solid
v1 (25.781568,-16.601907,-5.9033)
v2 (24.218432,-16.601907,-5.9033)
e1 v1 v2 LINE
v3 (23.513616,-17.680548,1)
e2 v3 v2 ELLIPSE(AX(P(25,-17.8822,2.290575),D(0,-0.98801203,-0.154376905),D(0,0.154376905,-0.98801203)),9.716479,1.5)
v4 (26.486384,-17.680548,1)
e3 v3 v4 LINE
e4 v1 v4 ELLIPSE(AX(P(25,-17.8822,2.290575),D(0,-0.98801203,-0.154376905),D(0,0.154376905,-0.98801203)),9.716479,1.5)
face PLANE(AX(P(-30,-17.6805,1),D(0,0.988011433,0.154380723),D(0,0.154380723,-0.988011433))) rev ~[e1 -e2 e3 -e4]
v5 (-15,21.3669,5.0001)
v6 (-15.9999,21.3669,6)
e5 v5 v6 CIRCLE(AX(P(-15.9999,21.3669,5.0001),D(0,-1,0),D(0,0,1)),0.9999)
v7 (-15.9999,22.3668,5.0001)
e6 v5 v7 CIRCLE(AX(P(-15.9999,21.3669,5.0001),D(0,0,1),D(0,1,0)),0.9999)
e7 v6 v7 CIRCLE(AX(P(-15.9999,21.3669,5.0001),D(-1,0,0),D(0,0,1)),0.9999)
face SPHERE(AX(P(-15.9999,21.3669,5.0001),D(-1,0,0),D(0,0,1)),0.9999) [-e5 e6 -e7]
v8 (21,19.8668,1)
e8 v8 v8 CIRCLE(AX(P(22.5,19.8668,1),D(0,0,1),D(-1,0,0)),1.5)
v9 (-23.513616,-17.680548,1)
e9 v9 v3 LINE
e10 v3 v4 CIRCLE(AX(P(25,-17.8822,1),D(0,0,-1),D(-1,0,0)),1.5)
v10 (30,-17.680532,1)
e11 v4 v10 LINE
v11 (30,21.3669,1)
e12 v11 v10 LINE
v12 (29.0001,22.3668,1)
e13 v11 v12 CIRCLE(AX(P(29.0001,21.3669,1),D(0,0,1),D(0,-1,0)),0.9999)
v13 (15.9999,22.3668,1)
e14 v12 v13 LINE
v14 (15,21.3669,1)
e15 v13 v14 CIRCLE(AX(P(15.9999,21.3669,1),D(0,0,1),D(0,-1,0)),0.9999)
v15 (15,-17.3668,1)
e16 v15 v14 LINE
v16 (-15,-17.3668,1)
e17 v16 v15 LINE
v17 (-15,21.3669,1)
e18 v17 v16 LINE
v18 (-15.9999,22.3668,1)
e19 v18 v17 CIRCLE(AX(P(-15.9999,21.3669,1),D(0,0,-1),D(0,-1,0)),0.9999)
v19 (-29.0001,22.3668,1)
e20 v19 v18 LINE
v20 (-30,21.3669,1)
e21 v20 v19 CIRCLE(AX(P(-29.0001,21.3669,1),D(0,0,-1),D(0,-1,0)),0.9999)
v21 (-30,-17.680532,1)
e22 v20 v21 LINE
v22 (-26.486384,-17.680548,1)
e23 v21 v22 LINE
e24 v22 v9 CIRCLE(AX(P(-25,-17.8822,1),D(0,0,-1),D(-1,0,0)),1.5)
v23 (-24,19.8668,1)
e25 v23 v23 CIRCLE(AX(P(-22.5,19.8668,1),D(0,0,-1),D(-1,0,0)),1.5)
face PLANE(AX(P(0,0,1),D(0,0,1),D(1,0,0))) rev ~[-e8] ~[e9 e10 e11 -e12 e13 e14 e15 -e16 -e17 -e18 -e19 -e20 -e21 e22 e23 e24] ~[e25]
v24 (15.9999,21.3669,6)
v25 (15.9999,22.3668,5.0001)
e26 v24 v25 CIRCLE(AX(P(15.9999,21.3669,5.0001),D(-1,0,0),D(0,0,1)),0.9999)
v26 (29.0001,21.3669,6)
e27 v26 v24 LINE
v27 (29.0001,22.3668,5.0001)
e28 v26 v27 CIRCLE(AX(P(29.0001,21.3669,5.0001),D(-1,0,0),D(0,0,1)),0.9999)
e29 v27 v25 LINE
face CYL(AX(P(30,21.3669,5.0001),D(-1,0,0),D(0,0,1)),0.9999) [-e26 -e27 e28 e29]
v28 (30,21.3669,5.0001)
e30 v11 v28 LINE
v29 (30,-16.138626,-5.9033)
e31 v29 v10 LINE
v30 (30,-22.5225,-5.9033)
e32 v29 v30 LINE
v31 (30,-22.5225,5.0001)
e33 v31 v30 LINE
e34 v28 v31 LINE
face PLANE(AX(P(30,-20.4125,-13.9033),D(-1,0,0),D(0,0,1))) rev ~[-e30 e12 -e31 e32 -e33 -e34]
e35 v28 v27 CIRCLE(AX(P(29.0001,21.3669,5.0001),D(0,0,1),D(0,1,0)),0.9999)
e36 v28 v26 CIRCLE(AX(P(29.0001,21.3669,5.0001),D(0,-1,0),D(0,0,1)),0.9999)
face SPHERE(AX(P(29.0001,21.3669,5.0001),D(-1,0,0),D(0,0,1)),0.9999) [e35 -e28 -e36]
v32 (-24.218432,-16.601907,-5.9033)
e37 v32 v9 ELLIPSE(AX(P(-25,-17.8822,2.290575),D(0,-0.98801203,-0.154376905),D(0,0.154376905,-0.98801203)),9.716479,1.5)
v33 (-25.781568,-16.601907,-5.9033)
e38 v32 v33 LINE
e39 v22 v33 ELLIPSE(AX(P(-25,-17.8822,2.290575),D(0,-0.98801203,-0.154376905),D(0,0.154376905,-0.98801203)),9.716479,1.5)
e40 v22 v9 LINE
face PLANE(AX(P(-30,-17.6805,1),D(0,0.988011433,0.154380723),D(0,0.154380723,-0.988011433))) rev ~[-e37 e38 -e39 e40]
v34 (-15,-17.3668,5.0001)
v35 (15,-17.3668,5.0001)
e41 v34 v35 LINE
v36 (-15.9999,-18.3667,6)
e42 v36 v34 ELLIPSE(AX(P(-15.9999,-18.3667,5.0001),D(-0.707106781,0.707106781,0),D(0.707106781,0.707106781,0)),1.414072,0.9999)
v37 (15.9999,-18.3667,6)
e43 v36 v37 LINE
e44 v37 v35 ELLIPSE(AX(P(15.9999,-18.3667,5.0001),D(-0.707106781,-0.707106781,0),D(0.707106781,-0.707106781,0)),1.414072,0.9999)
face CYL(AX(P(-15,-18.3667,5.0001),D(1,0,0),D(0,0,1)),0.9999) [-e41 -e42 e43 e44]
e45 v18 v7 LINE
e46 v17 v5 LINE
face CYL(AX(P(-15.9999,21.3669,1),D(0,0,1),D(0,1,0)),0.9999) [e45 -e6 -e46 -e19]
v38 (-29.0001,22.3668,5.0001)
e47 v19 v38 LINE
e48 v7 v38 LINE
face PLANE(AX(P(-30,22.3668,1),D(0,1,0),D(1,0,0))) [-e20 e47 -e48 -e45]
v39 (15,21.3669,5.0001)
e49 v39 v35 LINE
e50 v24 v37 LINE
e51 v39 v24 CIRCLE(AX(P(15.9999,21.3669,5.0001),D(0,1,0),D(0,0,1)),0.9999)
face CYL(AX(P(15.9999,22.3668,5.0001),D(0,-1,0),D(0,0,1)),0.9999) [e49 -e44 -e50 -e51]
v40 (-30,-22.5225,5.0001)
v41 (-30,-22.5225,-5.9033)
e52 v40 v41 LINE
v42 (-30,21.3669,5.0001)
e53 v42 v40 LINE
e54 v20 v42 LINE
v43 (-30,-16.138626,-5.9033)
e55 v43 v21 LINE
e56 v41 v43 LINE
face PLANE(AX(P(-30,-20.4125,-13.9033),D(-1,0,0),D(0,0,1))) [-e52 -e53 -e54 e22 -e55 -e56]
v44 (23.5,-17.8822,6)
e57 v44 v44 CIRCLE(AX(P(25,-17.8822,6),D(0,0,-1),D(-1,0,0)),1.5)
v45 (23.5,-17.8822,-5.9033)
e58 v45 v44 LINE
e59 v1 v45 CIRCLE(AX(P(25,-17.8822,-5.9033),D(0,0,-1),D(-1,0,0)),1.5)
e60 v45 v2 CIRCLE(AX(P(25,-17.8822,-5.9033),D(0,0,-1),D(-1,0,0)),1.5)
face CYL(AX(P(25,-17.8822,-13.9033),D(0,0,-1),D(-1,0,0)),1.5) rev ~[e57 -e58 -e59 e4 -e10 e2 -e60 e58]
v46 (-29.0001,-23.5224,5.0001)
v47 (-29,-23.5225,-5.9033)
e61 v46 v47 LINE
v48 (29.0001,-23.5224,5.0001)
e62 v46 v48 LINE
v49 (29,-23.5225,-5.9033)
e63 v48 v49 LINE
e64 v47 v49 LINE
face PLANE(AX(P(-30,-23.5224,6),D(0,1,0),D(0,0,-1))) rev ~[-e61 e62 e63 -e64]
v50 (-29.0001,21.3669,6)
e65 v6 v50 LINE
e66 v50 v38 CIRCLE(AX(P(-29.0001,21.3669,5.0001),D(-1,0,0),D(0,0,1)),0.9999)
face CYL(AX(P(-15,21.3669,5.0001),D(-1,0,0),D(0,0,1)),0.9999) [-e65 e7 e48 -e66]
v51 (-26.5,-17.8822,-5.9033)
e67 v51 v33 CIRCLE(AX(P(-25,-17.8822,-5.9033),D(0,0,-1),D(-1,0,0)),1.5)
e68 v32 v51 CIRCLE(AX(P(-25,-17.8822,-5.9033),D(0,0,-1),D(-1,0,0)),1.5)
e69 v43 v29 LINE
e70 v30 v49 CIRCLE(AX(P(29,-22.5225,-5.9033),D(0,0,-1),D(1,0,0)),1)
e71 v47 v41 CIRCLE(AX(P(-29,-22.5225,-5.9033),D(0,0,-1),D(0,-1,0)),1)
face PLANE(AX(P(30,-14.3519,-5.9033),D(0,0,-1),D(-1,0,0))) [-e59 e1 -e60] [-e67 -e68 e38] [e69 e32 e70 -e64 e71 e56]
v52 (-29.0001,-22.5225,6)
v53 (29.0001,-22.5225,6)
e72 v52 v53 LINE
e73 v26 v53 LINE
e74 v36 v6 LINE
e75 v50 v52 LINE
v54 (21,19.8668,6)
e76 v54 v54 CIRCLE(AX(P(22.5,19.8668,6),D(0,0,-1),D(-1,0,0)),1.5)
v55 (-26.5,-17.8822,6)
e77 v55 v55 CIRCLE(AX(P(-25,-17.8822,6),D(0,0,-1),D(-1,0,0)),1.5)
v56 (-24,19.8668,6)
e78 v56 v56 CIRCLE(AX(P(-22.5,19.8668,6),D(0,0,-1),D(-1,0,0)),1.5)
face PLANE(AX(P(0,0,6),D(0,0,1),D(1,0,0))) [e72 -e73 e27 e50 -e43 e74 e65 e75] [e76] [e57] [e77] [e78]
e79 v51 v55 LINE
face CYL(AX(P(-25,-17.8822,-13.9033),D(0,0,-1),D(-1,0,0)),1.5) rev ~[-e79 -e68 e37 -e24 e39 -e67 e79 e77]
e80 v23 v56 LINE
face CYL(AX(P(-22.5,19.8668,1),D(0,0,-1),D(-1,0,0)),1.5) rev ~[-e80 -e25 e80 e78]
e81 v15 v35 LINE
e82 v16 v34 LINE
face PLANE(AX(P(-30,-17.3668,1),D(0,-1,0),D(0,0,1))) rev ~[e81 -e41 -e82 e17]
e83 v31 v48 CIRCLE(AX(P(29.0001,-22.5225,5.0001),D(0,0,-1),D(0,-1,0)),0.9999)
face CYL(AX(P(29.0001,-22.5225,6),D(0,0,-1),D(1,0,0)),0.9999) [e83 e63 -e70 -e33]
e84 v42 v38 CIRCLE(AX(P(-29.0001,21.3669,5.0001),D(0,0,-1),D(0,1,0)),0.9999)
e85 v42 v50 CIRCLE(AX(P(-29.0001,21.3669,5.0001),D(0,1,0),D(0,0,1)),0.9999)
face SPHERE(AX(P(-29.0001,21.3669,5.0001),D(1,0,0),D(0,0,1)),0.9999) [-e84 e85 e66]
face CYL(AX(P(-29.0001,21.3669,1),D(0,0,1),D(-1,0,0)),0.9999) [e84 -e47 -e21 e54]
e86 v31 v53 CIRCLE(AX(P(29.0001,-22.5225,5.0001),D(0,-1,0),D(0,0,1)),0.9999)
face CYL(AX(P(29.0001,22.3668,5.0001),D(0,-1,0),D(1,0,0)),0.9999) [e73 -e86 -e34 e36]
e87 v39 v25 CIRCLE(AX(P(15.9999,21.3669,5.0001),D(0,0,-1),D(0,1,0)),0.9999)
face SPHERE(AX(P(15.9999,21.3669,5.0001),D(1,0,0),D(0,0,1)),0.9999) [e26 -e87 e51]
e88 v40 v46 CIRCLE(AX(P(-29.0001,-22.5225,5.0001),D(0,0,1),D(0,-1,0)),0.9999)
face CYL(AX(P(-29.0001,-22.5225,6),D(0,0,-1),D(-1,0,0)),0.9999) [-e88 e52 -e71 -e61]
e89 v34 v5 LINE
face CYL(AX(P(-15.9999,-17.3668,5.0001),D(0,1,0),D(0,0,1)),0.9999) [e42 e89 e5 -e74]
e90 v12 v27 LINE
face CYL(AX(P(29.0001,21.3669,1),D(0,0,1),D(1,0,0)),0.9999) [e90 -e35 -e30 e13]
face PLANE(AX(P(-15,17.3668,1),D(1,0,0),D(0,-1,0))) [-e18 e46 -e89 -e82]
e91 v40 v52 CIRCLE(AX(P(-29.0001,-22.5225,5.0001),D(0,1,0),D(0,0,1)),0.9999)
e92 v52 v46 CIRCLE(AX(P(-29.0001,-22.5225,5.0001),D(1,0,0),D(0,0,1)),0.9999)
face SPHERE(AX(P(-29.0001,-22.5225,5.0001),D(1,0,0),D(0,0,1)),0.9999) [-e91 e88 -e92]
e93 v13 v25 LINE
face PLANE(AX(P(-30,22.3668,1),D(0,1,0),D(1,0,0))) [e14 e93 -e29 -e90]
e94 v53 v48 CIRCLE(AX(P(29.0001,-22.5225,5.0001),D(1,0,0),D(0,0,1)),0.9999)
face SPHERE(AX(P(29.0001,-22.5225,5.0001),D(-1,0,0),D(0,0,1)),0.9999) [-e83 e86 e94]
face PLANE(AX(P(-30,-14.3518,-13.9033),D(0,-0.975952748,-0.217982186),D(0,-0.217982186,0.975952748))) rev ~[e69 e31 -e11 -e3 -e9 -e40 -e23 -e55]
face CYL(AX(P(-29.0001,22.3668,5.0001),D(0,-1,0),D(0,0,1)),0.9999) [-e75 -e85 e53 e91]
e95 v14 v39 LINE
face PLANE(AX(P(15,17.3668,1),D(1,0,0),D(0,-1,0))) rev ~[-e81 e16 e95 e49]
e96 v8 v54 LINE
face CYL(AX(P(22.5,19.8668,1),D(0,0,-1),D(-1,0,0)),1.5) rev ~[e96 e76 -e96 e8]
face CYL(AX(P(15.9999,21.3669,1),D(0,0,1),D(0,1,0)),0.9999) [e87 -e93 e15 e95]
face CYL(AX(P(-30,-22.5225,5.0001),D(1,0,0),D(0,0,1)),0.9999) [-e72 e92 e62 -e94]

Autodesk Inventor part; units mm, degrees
ref_plane "YZ Plane" through (0, 0, 0) normal (1, 0, 0) x (0, 1, 0)
ref_plane "XZ Plane" through (0, 0, 0) normal (0, 1, 0) x (-1, 0, 0)
ref_plane "Work Plane1" through (0, 0, 1) normal (0, 0, 1) x (1, 0, 0)
sketch "Sketch2" plane through (0, 0, 1) normal (0, 0, 1) x (1, 0, 0)
  line L0 (-29.9972, 16.3668) -> (29.9972, 16.3668) construction
  line L1 (29.9972, -16.3668) -> (-29.9972, -16.3668) construction
  circle A0 centre (0, 0) radius 8 construction
  line L2 (-18, -2.183) -> (-18, 3.067) construction
  line L3 (17.5, -1.0311) -> (17.5, 1.567) construction
  line L4 (0, 16.3668) -> (0, 17.3668) construction
  line L5 (0, -16.3668) -> (0, -17.3668) construction
  line L6 (0, 17.3668) -> (-30, 17.3668) construction
  line L7 (0, 17.3668) -> (30, 17.3668) construction
  line L8 (-30, 17.3668) -> (30, 17.3668) construction
  line L9 (30, 17.3668) -> (30, -17.3668) construction
  line L10 (30, -17.3668) -> (-30, -17.3668) construction
  line L11 (-30, -17.3668) -> (-30, 17.3668) construction
  line L12 (-30, 17.3668) -> (-15, 17.3668)
  line L13 (-15, 17.3668) -> (-15, -17.3668)
  line L14 (-15, -17.3668) -> (-30, -17.3668)
  line L15 (-30, -17.3668) -> (-30, 17.3668)
  line L16 (30, 17.3668) -> (15, 17.3668)
  line L17 (15, 17.3668) -> (15, -17.3668)
  line L18 (15, -17.3668) -> (30, -17.3668)
  line L19 (30, -17.3668) -> (30, 17.3668)
  point P0 (0, 0)
  dimension "d0" = 1
  dimension "d1" = 1
  dimension "d2" = 30
  dimension "d3" = 30
  dimension "d4" = 15
  dimension "d5" = 15
extrude "Extrusion1" add sketch "Sketch2" along normal blind 5
ref_plane "Work Plane2" through (0, -13.2935, -27.0771) normal (0, -0.988012, -0.1543769) x (-1, 0, 0)
sketch "Sketch3" plane through (0, -13.2935, -27.0771) normal (0, -0.988012, -0.1543769) x (-1, 0, 0)
  line L0 (15, -28.3694) -> (30, -28.3694) projected
  line L1 (15, -28.3694) -> (15, -33.3094) projected
  line L2 (30, -33.3094) -> (15, -33.3094) projected
  line L3 (30, -28.3694) -> (30, -33.3094) projected
  line L4 (-15, -28.3694) -> (-30, -28.3694) projected
  line L5 (-30, -28.3694) -> (-30, -33.3094) projected
  line L6 (-15, -33.3094) -> (-30, -33.3094) projected
  line L7 (-15, -28.3694) -> (-15, -33.3094) projected
  line L8 (-24.9964, -11.75) -> (24.9964, -11.75) projected
  line L9 (-30, -33.3094) -> (30, -33.3094)
  line L10 (30, -33.3094) -> (30, -11.3094)
  line L11 (30, -11.3094) -> (-30, -11.3094)
  line L12 (-30, -11.3094) -> (-30, -33.3094)
  point P0 (0, -24.7003)
  dimension "d8" = 60
  dimension "d9" = 22
extrude "Extrusion2" add sketch "Sketch3" along normal blind 5
sketch "Sketch5" plane through (-30, -17.3668, 1) normal (-1, 0, 0) x (0, 0, 1)
  line L0 (0, 0) -> (0, 34.7337) projected
  line L1 (0, 0) -> (5, 0) projected
  line L2 (5, 34.7337) -> (5, 0) projected
  line L3 (0, 34.7337) -> (5, 34.7337) projected
  line L4 (4.833, -1.0688) -> (-16.9033, 2.3275) projected
  line L5 (-16.9033, 2.3275) -> (-17.6752, -2.6126) projected
  line L6 (4.0611, -6.0089) -> (-17.6752, -2.6126) projected
  line L7 (4.833, -1.0688) -> (4.0611, -6.0089) projected
  line L8 (5, 0) -> (5, -6.1556)
  line L9 (4.0611, -6.0089) -> (-17.6752, -2.6126) projected
  line L10 (5, -6.1556) -> (4.0611, -6.0089)
  line L11 (0, 0) -> (5, 0) projected
  line L12 (0, 0) -> (0, -3.0778)
  line L13 (4.833, -1.0688) -> (4.0611, -6.0089) projected
  line L14 (0, -3.0778) -> (4.0611, -6.0089)
  point P0 (-1, 17.3668)
extrude "Extrusion3" add sketch "Sketch5" against normal up to surface (60 mm away) contours L1 L8 L10 L7 L4 L12 | L4 L7 L14 L12
sketch "Sketch6" plane through (-30, 17.3668, 1) normal (-1, 0, 0) x (0, 0, 1)
  line L0 (0, -35.0474) -> (0, 0) projected
  line L1 (0, -35.0474) -> (-16.9033, -32.4062) projected
  line L2 (-16.9033, -32.4062) -> (-17.6752, -37.3463) projected
  line L3 (-17.6752, -37.3463) -> (5, -40.8893) projected
  line L4 (5, 0) -> (5, -40.8893) projected
  line L5 (0, 0) -> (5, 0) projected
  line L6 (-16.9033, -32.4062) -> (-24.0532, -32.4062)
  line L7 (-24.0532, -32.4062) -> (-24.0532, -41.4181)
  line L8 (-24.0532, -41.4181) -> (-16.9033, -41.4181)
  line L9 (-16.9033, -41.4181) -> (-16.9033, -32.4062)
  line L10 (-16.9033, -32.4062) -> (-14.9033, -32.4062)
  line L11 (-14.9033, -32.4062) -> (-14.9033, -41.4181)
  line L12 (-14.9033, -41.4181) -> (-16.9033, -41.4181)
  line L13 (-16.9033, -41.4181) -> (-16.9033, -32.4062)
  point P0 (-1, -17.3668)
  dimension "d18" = 2
extrude "Extrusion4" cut sketch "Sketch6" against normal through all contours L11 L3 L9 L1 | L1 L10 L11 | L9 L3 L2 | L2 L3 L9 L8 L7 L6 | L11 L12 L9 L3
sketch "Sketch7" plane through (-30, 17.3668, 1) normal (0, 1, 0) x (1, 0, 0)
  line L0 (0, 0) -> (15, 0) projected
  line L1 (0, 0) -> (0, -5) projected
  line L2 (15, -5) -> (0, -5) projected
  line L3 (15, 0) -> (15, -5) projected
  line L4 (60, 0) -> (45, 0) projected
  line L5 (45, 0) -> (45, -5) projected
  line L6 (60, -5) -> (45, -5) projected
  line L7 (60, 0) -> (60, -5) projected
  point P0 (30, 1)
extrude "Extrusion5" add sketch "Sketch7" along normal blind 5
ref_plane "Work Plane3" through (-30, -20.4125, -11.9033) normal (0, 0, -1) x (-1, 0, 0)
sketch "Sketch8" plane through (-30, -20.4125, -11.9033) normal (0, 0, -1) x (-1, 0, 0)
  line L0 (-7.7, 0) -> (-6, 0) projected
  line L1 (-2.3, 5.0607) -> (-7.7, 5.0607) projected
  circle A0 centre (-5, 2.5303) radius 1.5 projected
  line L2 (-7.7, 0) -> (-6, 0) projected
  line L3 (-57.6, 0) -> (-52.4, 0)
  line L4 (-52.4, 0) -> (-52.4, -6.7313)
  line L5 (-52.4, -6.7313) -> (-57.6, -6.7313)
  line L6 (-57.6, -6.7313) -> (-57.6, 0)
  line L7 (-7.6, 1.0292) -> (-2.4, 1.0292)
  line L8 (-2.4, 1.0292) -> (-2.4, -4.6372)
  line L9 (-2.4, -4.6372) -> (-7.6, -4.6372)
  line L10 (-7.6, -4.6372) -> (-7.6, 1.0292)
  line L11 (-6, 0) -> (-2.3, 0) projected
  line L12 (-2.3, 5.0607) -> (-7.7, 5.0607) projected
  line L13 (-6, 0) -> (-2.3, 0) projected
  circle A1 centre (-5, 2.5303) radius 1.5 projected
  line L14 (-7.7, 5.0607) -> (-7.7, 0) projected
  line L15 (-2.3, 0) -> (-2.3, 5.0607) projected
  line L16 (-7.7, 5.0607) -> (-7.7, 0) projected
  line L17 (-2.3, 0) -> (-2.3, 5.0607) projected
  point P0 (-30, 20.4125)
  point P1 (-7.2835, 0)
  point P2 (-2.4, 0)
  point P3 (-7.2835, 0.8465)
  point P4 (-7.6, 1.0292)
  point P5 (-7.6, 4.0314)
  point P6 (-5.8173, 5.0607)
  point P7 (-4.1827, 5.0607)
  point P8 (-2.4, 4.0314)
extrude "Extrusion6" [suppressed]
sketch "Sketch9" plane through (-30, -20.4125, -13.9033) normal (0, 0, -1) x (-1, 0, 0)
  circle A0 centre (-55, 2.5303) radius 1.5 projected
  circle A1 centre (-5, 2.5303) radius 1.5 projected
  point P0 (-30, 20.4125)
extrude "Extrusion7" cut sketch "Sketch9" against normal blind 8
sketch "Sketch10" plane through (0, 0, 1) normal (0, 0, -1) x (-1, 0, 0)
  line L0 (15, 22.3649) -> (15, 22.3668) projected
  line L1 (30, 22.3668) -> (30, 22.3649) projected
  line L2 (30, 22.3668) -> (15, 22.3668) projected
  line L3 (-30, 22.3649) -> (-30, 22.3668) projected
  line L4 (-15, 22.3668) -> (-15, 22.3649) projected
  line L5 (-15, 22.3668) -> (-30, 22.3668) projected
  line L6 (-15, 22.3668) -> (-30, 22.3668) projected
  line L7 (-30, 22.3668) -> (-30, 19.8668)
  line L8 (-30, 22.3668) -> (-30, -17.6805) projected
  line L9 (-30, 19.8668) -> (-22.5, 19.8668)
  line L10 (30, 22.3668) -> (30, 19.8668)
  line L11 (30, -17.6805) -> (30, 22.3668) projected
  line L12 (30, 19.8668) -> (22.5, 19.8668)
  circle A0 centre (-22.5, 19.8668) radius 1.5
  circle A1 centre (22.5, 19.8668) radius 1.5
  line L13 (15, 22.3649) -> (30, 22.3649) projected
  line L14 (-30, 22.3649) -> (-15, 22.3649) projected
  point P0 (0, 0)
  point P1 (30, 17.3668)
  point P2 (-30, 17.3668)
  dimension "d24" = 2.5
  dimension "d25" = 7.5
  dimension "d26" = 2.5
  dimension "d27" = 7.5
  dimension "d28" = 3
  dimension "d29" = 3
extrude "Extrusion8" cut sketch "Sketch10" against normal through all
sketch "Sketch11" plane through (-30, -20.4125, -13.9033) normal (0, 0, -1) x (-1, 0, 0)
  circle A0 centre (-55, 2.5303) radius 1.5 projected
  circle A1 centre (-5, 2.5303) radius 1.5 projected
  point P0 (-30, 20.4125)
extrude "Extrusion9" cut sketch "Sketch11" against normal through all
sketch "Sketch12" plane through (-30, -20.4125, -13.9033) normal (-1, 0, 0) x (0, 0, 1)
  line L0 (0, 5.0607) -> (0, 0) projected
  line L1 (0, 0) -> (19.9033, -3.1099) projected
  line L2 (19.9033, -3.1099) -> (19.9033, 42.7794) projected
  line L3 (14.9033, 42.7794) -> (19.9033, 42.7794) projected
  line L4 (14.9033, 2.732) -> (14.9033, 42.7794) projected
  line L5 (14.9033, 2.732) -> (0, 5.0607) projected
  line L6 (0, 5.0607) -> (0, 6.0607)
  line L7 (6.5941, 4.0303) -> (14.9033, 2.732) projected
  line L8 (0, 6.0607) -> (14.9033, 2.732)
  point P0 (13.9033, 20.4125)
  dimension "d34" = 1
extrude "Extrusion10" add sketch "Sketch12" against normal up to surface (60 mm away) contours L6 L8 L5
sketch "Sketch13" plane through (-30, -23.5224, 6) normal (-1, 0, 0) x (0, 0, 1)
  line L0 (-19.9033, 4.1402) -> (0, 4.1402) projected
  line L1 (-19.9033, 7.1402) -> (0, 7.1402) projected
  line L2 (-19.9033, 9.1706) -> (-19.9033, 3.1099) construction
  line L3 (-19.9033, 3.1099) -> (0, 0) construction
  line L4 (0, 0) -> (0, 45.8893) construction
  line L5 (-5, 45.8893) -> (0, 45.8893) projected
  line L6 (-5, 5.8419) -> (-5, 45.8893) projected
  line L7 (-5, 5.8419) -> (-19.9033, 9.1706) projected
  line L8 (-19.9033, 3.1099) -> (0, 3.1099)
  line L9 (0, 3.1099) -> (0, 0)
  line L10 (0, 0) -> (-19.9033, 0)
  line L11 (-19.9033, 0) -> (-19.9033, 3.1099)
  point P0 (-6, 23.5224)
extrude "Extrusion11" add sketch "Sketch13" against normal up to surface (60 mm away) contours L8 L9 L10 L11
fillet "Fillet1" radius 1 14 edges at (0, -23.5224, 6) (-22.5, 22.3668, 6) (22.5, 22.3668, 6) (-30, -0.5778, 6) (-15, 2.5, 6) (0, -17.3668, 6) (15, 2.5, 6) (30, -0.5778, 6) (-30, -23.5224, -3.9516) (30, -23.5224, -3.9516) (-30, 22.3668, 3.5) (-15, 22.3668, 3.5) (15, 22.3668, 3.5) (30, 22.3668, 3.5)
sketch "Sketch14" plane through (30, -14.3519, -13.9033) normal (0, 0, -1) x (-1, 0, 0)
  circle A0 centre (5, -3.5303) radius 1.5 projected
  circle A1 centre (55, -3.5303) radius 1.5 projected
  line L0 (60, -8.1706) -> (60, 0) projected
  line L1 (60, 0) -> (0, 0) projected
  line L2 (0, 0) -> (0, -8.1706) projected
  line L3 (59, -9.1706) -> (1, -9.1706) projected
  arc A2 (59, -9.1706) -> (60, -8.1706) centre (59, -8.1706) ccw projected
  arc A3 (0, -8.1706) -> (1, -9.1706) centre (1, -8.1706) ccw projected
  point P0 (30, 14.3519)
extrude "Extrusion12" cut sketch "Sketch14" against normal blind 8
sketch "Sketch15" plane through (-30, -17.6805, 1) normal (-1, 0, 0) x (0, 0, 1)
  line L0 (-6.9033, 1.5418) -> (-6.9033, -4.8419) projected
  line L1 (4, 39.0474) -> (4, -4.8419) projected
  line L2 (0, 0) -> (0, 39.0474) projected
  line L3 (0, 0) -> (-6.9033, 1.5418) projected
  line L4 (4, -5.8419) -> (-6.9033, -5.8419) projected
  line L5 (-6.9033, -5.8419) -> (-43.1083, -5.8419)
  line L6 (-43.1083, -5.8419) -> (-43.1083, 9.6282)
  line L7 (-43.1083, 9.6282) -> (-6.9033, 9.6282)
  line L8 (-6.9033, 9.6282) -> (-6.9033, -5.8419)
  line L9 (4, -4.8419) -> (-6.9033, -4.8419) projected
  line L10 (0, 39.0474) -> (4, 39.0474) projected
  point P0 (-1, 17.6805)
extrude "Extrusion13" cut sketch "Sketch15" against normal through all contours L0 L8 L5 L6 L7
properties part number "camera_holder"
